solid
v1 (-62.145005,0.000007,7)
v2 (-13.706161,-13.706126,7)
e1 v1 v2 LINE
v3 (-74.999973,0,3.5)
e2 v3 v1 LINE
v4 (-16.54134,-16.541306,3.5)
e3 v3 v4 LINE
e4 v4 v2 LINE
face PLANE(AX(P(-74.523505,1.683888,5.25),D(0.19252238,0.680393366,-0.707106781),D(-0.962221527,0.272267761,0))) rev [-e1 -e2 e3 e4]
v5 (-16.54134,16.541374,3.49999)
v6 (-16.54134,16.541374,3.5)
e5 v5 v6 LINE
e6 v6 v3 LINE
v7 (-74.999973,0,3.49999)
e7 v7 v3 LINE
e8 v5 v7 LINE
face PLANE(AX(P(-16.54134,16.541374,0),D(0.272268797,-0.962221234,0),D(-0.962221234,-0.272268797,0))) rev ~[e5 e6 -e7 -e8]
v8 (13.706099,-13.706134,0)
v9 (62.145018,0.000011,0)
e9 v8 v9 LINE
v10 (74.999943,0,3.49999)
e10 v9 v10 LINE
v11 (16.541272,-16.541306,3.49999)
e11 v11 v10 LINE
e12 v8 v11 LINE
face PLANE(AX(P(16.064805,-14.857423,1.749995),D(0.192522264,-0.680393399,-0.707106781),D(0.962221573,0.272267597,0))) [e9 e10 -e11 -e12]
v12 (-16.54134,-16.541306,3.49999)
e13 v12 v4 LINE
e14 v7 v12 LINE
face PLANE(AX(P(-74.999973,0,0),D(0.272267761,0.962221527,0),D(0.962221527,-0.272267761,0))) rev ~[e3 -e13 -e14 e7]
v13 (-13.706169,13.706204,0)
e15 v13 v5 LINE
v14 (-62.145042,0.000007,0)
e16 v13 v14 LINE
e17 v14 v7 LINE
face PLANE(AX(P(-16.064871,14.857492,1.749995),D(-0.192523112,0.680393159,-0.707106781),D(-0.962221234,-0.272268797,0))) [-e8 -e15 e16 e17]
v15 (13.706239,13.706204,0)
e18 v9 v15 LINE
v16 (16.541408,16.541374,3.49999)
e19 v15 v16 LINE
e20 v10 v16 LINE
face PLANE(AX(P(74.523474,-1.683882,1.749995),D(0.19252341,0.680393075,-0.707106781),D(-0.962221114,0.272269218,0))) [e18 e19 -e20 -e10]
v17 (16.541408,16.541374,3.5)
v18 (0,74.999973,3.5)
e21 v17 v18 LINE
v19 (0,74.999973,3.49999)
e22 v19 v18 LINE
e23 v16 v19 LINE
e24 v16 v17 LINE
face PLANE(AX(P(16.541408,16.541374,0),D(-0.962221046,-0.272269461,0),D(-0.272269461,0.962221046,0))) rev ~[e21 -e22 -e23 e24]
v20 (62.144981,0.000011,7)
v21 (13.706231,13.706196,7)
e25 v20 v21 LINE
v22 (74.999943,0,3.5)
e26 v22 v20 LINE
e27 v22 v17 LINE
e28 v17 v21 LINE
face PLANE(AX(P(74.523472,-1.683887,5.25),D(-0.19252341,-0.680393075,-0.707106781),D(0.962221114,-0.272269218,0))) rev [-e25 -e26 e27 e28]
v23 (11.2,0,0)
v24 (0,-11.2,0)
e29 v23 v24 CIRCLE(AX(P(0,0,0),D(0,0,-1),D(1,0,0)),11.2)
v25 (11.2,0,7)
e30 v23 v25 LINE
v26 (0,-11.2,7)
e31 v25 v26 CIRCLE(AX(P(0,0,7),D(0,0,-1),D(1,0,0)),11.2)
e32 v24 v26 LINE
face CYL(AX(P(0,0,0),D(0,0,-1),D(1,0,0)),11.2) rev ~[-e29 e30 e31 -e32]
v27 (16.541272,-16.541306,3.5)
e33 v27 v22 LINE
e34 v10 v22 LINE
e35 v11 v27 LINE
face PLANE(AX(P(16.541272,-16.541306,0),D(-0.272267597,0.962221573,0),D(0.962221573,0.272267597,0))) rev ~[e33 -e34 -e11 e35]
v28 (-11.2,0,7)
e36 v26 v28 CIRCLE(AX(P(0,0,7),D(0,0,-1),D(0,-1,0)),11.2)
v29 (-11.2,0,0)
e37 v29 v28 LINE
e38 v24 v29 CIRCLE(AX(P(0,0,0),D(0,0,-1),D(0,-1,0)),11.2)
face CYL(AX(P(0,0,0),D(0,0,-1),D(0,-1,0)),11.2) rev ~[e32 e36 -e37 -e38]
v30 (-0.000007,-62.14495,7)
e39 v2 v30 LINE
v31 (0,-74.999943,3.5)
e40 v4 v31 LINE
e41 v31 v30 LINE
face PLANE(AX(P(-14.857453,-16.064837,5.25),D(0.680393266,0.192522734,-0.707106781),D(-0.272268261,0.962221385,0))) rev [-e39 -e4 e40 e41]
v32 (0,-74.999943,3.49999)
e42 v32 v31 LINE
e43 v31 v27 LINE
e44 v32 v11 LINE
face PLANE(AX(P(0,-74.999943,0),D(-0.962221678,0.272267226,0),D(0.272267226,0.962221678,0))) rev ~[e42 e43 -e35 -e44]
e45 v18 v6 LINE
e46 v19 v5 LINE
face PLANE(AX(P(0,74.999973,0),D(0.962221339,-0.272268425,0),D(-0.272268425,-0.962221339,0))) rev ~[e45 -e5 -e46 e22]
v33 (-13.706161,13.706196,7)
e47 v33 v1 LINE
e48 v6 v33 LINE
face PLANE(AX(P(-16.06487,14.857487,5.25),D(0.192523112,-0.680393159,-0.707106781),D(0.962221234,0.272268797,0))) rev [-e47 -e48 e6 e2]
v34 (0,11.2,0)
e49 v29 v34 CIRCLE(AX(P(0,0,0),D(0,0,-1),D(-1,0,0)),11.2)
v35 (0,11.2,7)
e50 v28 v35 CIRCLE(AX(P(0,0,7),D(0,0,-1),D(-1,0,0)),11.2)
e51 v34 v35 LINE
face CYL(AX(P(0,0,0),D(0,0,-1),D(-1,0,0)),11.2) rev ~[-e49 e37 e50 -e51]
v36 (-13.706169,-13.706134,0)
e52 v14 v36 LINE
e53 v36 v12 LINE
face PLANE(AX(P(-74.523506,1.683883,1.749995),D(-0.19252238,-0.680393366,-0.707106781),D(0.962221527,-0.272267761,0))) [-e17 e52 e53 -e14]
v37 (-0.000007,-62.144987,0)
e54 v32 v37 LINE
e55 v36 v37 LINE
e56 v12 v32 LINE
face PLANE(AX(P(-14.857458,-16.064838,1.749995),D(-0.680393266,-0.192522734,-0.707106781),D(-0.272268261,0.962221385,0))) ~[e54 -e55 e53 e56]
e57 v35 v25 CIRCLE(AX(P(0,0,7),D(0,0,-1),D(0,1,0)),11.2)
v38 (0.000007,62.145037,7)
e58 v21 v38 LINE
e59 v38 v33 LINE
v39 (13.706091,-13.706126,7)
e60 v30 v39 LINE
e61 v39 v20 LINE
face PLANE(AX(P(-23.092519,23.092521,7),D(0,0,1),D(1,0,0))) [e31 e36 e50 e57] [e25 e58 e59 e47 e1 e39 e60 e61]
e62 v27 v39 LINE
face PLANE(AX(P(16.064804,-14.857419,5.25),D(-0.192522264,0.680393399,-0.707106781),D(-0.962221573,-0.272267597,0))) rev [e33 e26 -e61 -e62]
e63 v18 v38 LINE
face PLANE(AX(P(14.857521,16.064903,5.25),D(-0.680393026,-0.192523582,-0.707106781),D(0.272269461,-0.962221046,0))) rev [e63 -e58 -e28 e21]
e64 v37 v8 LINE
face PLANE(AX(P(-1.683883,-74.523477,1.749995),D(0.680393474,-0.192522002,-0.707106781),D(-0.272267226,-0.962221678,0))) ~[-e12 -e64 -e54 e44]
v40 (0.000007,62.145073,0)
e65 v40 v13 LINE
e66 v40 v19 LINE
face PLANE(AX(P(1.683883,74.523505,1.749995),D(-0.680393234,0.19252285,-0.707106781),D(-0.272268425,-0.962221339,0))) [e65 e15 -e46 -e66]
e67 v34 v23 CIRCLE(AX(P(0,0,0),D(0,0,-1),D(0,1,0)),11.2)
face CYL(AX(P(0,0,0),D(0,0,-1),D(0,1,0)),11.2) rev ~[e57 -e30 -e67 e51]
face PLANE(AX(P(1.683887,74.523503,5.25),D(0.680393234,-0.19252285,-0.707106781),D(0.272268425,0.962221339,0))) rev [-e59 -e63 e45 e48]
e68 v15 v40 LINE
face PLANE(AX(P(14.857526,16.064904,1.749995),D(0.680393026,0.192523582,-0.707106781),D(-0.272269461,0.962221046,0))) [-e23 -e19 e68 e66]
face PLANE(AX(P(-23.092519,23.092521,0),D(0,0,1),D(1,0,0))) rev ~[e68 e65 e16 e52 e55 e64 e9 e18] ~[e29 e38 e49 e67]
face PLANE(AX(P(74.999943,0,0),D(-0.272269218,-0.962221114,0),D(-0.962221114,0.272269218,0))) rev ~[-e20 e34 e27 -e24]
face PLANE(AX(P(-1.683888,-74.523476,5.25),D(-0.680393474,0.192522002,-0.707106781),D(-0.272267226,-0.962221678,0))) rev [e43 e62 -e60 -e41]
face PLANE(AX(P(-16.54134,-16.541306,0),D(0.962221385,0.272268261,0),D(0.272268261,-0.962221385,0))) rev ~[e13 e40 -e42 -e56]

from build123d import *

# Parameters (mm, degrees)
F1_DEPTH = 7
F2_SIZE  = 3.5
F3_SIZE  = 3.49999


# Not quite as in the source:
# - a fillet or chamfer is up to 0.001 mm smaller than in the source, because OpenCascade refuses the exact size


with BuildPart() as f1:
    # F0 (on Top) → F1 (new body)
    with BuildSketch(Plane.XY):
        with BuildLine():
            ThreePointArc((-11.2, 0), (-7.9195959493, 7.9195959493), (0, 11.2))
            Line((0, 11.2), (0, 74.9999731779))
            Line((0, 74.9999731779), (-16.5413403588, 16.5413743234))
            Line((-16.5413403588, 16.5413743234), (-74.9999731779, 0))
            Line((-74.9999731779, 0), (-11.2, 0))
        make_face()
        with BuildLine():
            ThreePointArc((0, 11.2), (7.9195959493, 7.9195959493), (11.2, 0))
            Line((11.2, 0), (74.9999433756, 0))
            Line((74.9999433756, 0), (16.5414082881, 16.5413743234))
            Line((16.5414082881, 16.5413743234), (0, 74.9999731779))
            Line((0, 74.9999731779), (0, 11.2))
        make_face()
        with BuildLine():
            Line((74.9999433756, 0), (11.2, 0))
            ThreePointArc((11.2, 0), (7.9195959493, -7.9195959493), (0, -11.2))
            Line((0, -11.2), (0, -74.9999433756))
            Line((0, -74.9999433756), (16.5412724298, -16.5413063943))
            Line((16.5412724298, -16.5413063943), (74.9999433756, 0))
        make_face()
        with BuildLine():
            Line((0, -74.9999433756), (0, -11.2))
            ThreePointArc((0, -11.2), (-7.9195959493, -7.9195959493), (-11.2, 0))
            Line((-11.2, 0), (-74.9999731779, 0))
            Line((-74.9999731779, 0), (-16.5413403588, -16.5413063943))
            Line((-16.5413403588, -16.5413063943), (0, -74.9999433756))
        make_face()
    extrude(amount=F1_DEPTH)

    # F2
    f2_edges = [f1.edges().sort_by_distance(p)[0] for p in [
        (-45.770657, -8.270653, 7),
        (-8.27067, -45.770625, 7),
        (8.270636, -45.770625, 7),
        (45.770608, -8.270653, 7),
        (45.770676, 8.270687, 7),
        (8.270704, 45.770674, 7),
        (-8.27067, 45.770674, 7),
        (-45.770657, 8.270687, 7),
    ]]
    chamfer(f2_edges, length=F2_SIZE)

    # F3 (size 3.5 in the source; OpenCascade refuses exactly that, so slightly less here)
    f3_edges = [f1.edges().sort_by_distance(p)[0] for p in [
        (-45.770657, -8.270653, 0),
        (-45.770657, 8.270687, 0),
        (-8.27067, 45.770674, 0),
        (8.270704, 45.770674, 0),
        (45.770676, 8.270687, 0),
        (45.770608, -8.270653, 0),
        (8.270636, -45.770625, 0),
        (-8.27067, -45.770625, 0),
    ]]
    chamfer(f3_edges, length=F3_SIZE)


solid = f1.part
